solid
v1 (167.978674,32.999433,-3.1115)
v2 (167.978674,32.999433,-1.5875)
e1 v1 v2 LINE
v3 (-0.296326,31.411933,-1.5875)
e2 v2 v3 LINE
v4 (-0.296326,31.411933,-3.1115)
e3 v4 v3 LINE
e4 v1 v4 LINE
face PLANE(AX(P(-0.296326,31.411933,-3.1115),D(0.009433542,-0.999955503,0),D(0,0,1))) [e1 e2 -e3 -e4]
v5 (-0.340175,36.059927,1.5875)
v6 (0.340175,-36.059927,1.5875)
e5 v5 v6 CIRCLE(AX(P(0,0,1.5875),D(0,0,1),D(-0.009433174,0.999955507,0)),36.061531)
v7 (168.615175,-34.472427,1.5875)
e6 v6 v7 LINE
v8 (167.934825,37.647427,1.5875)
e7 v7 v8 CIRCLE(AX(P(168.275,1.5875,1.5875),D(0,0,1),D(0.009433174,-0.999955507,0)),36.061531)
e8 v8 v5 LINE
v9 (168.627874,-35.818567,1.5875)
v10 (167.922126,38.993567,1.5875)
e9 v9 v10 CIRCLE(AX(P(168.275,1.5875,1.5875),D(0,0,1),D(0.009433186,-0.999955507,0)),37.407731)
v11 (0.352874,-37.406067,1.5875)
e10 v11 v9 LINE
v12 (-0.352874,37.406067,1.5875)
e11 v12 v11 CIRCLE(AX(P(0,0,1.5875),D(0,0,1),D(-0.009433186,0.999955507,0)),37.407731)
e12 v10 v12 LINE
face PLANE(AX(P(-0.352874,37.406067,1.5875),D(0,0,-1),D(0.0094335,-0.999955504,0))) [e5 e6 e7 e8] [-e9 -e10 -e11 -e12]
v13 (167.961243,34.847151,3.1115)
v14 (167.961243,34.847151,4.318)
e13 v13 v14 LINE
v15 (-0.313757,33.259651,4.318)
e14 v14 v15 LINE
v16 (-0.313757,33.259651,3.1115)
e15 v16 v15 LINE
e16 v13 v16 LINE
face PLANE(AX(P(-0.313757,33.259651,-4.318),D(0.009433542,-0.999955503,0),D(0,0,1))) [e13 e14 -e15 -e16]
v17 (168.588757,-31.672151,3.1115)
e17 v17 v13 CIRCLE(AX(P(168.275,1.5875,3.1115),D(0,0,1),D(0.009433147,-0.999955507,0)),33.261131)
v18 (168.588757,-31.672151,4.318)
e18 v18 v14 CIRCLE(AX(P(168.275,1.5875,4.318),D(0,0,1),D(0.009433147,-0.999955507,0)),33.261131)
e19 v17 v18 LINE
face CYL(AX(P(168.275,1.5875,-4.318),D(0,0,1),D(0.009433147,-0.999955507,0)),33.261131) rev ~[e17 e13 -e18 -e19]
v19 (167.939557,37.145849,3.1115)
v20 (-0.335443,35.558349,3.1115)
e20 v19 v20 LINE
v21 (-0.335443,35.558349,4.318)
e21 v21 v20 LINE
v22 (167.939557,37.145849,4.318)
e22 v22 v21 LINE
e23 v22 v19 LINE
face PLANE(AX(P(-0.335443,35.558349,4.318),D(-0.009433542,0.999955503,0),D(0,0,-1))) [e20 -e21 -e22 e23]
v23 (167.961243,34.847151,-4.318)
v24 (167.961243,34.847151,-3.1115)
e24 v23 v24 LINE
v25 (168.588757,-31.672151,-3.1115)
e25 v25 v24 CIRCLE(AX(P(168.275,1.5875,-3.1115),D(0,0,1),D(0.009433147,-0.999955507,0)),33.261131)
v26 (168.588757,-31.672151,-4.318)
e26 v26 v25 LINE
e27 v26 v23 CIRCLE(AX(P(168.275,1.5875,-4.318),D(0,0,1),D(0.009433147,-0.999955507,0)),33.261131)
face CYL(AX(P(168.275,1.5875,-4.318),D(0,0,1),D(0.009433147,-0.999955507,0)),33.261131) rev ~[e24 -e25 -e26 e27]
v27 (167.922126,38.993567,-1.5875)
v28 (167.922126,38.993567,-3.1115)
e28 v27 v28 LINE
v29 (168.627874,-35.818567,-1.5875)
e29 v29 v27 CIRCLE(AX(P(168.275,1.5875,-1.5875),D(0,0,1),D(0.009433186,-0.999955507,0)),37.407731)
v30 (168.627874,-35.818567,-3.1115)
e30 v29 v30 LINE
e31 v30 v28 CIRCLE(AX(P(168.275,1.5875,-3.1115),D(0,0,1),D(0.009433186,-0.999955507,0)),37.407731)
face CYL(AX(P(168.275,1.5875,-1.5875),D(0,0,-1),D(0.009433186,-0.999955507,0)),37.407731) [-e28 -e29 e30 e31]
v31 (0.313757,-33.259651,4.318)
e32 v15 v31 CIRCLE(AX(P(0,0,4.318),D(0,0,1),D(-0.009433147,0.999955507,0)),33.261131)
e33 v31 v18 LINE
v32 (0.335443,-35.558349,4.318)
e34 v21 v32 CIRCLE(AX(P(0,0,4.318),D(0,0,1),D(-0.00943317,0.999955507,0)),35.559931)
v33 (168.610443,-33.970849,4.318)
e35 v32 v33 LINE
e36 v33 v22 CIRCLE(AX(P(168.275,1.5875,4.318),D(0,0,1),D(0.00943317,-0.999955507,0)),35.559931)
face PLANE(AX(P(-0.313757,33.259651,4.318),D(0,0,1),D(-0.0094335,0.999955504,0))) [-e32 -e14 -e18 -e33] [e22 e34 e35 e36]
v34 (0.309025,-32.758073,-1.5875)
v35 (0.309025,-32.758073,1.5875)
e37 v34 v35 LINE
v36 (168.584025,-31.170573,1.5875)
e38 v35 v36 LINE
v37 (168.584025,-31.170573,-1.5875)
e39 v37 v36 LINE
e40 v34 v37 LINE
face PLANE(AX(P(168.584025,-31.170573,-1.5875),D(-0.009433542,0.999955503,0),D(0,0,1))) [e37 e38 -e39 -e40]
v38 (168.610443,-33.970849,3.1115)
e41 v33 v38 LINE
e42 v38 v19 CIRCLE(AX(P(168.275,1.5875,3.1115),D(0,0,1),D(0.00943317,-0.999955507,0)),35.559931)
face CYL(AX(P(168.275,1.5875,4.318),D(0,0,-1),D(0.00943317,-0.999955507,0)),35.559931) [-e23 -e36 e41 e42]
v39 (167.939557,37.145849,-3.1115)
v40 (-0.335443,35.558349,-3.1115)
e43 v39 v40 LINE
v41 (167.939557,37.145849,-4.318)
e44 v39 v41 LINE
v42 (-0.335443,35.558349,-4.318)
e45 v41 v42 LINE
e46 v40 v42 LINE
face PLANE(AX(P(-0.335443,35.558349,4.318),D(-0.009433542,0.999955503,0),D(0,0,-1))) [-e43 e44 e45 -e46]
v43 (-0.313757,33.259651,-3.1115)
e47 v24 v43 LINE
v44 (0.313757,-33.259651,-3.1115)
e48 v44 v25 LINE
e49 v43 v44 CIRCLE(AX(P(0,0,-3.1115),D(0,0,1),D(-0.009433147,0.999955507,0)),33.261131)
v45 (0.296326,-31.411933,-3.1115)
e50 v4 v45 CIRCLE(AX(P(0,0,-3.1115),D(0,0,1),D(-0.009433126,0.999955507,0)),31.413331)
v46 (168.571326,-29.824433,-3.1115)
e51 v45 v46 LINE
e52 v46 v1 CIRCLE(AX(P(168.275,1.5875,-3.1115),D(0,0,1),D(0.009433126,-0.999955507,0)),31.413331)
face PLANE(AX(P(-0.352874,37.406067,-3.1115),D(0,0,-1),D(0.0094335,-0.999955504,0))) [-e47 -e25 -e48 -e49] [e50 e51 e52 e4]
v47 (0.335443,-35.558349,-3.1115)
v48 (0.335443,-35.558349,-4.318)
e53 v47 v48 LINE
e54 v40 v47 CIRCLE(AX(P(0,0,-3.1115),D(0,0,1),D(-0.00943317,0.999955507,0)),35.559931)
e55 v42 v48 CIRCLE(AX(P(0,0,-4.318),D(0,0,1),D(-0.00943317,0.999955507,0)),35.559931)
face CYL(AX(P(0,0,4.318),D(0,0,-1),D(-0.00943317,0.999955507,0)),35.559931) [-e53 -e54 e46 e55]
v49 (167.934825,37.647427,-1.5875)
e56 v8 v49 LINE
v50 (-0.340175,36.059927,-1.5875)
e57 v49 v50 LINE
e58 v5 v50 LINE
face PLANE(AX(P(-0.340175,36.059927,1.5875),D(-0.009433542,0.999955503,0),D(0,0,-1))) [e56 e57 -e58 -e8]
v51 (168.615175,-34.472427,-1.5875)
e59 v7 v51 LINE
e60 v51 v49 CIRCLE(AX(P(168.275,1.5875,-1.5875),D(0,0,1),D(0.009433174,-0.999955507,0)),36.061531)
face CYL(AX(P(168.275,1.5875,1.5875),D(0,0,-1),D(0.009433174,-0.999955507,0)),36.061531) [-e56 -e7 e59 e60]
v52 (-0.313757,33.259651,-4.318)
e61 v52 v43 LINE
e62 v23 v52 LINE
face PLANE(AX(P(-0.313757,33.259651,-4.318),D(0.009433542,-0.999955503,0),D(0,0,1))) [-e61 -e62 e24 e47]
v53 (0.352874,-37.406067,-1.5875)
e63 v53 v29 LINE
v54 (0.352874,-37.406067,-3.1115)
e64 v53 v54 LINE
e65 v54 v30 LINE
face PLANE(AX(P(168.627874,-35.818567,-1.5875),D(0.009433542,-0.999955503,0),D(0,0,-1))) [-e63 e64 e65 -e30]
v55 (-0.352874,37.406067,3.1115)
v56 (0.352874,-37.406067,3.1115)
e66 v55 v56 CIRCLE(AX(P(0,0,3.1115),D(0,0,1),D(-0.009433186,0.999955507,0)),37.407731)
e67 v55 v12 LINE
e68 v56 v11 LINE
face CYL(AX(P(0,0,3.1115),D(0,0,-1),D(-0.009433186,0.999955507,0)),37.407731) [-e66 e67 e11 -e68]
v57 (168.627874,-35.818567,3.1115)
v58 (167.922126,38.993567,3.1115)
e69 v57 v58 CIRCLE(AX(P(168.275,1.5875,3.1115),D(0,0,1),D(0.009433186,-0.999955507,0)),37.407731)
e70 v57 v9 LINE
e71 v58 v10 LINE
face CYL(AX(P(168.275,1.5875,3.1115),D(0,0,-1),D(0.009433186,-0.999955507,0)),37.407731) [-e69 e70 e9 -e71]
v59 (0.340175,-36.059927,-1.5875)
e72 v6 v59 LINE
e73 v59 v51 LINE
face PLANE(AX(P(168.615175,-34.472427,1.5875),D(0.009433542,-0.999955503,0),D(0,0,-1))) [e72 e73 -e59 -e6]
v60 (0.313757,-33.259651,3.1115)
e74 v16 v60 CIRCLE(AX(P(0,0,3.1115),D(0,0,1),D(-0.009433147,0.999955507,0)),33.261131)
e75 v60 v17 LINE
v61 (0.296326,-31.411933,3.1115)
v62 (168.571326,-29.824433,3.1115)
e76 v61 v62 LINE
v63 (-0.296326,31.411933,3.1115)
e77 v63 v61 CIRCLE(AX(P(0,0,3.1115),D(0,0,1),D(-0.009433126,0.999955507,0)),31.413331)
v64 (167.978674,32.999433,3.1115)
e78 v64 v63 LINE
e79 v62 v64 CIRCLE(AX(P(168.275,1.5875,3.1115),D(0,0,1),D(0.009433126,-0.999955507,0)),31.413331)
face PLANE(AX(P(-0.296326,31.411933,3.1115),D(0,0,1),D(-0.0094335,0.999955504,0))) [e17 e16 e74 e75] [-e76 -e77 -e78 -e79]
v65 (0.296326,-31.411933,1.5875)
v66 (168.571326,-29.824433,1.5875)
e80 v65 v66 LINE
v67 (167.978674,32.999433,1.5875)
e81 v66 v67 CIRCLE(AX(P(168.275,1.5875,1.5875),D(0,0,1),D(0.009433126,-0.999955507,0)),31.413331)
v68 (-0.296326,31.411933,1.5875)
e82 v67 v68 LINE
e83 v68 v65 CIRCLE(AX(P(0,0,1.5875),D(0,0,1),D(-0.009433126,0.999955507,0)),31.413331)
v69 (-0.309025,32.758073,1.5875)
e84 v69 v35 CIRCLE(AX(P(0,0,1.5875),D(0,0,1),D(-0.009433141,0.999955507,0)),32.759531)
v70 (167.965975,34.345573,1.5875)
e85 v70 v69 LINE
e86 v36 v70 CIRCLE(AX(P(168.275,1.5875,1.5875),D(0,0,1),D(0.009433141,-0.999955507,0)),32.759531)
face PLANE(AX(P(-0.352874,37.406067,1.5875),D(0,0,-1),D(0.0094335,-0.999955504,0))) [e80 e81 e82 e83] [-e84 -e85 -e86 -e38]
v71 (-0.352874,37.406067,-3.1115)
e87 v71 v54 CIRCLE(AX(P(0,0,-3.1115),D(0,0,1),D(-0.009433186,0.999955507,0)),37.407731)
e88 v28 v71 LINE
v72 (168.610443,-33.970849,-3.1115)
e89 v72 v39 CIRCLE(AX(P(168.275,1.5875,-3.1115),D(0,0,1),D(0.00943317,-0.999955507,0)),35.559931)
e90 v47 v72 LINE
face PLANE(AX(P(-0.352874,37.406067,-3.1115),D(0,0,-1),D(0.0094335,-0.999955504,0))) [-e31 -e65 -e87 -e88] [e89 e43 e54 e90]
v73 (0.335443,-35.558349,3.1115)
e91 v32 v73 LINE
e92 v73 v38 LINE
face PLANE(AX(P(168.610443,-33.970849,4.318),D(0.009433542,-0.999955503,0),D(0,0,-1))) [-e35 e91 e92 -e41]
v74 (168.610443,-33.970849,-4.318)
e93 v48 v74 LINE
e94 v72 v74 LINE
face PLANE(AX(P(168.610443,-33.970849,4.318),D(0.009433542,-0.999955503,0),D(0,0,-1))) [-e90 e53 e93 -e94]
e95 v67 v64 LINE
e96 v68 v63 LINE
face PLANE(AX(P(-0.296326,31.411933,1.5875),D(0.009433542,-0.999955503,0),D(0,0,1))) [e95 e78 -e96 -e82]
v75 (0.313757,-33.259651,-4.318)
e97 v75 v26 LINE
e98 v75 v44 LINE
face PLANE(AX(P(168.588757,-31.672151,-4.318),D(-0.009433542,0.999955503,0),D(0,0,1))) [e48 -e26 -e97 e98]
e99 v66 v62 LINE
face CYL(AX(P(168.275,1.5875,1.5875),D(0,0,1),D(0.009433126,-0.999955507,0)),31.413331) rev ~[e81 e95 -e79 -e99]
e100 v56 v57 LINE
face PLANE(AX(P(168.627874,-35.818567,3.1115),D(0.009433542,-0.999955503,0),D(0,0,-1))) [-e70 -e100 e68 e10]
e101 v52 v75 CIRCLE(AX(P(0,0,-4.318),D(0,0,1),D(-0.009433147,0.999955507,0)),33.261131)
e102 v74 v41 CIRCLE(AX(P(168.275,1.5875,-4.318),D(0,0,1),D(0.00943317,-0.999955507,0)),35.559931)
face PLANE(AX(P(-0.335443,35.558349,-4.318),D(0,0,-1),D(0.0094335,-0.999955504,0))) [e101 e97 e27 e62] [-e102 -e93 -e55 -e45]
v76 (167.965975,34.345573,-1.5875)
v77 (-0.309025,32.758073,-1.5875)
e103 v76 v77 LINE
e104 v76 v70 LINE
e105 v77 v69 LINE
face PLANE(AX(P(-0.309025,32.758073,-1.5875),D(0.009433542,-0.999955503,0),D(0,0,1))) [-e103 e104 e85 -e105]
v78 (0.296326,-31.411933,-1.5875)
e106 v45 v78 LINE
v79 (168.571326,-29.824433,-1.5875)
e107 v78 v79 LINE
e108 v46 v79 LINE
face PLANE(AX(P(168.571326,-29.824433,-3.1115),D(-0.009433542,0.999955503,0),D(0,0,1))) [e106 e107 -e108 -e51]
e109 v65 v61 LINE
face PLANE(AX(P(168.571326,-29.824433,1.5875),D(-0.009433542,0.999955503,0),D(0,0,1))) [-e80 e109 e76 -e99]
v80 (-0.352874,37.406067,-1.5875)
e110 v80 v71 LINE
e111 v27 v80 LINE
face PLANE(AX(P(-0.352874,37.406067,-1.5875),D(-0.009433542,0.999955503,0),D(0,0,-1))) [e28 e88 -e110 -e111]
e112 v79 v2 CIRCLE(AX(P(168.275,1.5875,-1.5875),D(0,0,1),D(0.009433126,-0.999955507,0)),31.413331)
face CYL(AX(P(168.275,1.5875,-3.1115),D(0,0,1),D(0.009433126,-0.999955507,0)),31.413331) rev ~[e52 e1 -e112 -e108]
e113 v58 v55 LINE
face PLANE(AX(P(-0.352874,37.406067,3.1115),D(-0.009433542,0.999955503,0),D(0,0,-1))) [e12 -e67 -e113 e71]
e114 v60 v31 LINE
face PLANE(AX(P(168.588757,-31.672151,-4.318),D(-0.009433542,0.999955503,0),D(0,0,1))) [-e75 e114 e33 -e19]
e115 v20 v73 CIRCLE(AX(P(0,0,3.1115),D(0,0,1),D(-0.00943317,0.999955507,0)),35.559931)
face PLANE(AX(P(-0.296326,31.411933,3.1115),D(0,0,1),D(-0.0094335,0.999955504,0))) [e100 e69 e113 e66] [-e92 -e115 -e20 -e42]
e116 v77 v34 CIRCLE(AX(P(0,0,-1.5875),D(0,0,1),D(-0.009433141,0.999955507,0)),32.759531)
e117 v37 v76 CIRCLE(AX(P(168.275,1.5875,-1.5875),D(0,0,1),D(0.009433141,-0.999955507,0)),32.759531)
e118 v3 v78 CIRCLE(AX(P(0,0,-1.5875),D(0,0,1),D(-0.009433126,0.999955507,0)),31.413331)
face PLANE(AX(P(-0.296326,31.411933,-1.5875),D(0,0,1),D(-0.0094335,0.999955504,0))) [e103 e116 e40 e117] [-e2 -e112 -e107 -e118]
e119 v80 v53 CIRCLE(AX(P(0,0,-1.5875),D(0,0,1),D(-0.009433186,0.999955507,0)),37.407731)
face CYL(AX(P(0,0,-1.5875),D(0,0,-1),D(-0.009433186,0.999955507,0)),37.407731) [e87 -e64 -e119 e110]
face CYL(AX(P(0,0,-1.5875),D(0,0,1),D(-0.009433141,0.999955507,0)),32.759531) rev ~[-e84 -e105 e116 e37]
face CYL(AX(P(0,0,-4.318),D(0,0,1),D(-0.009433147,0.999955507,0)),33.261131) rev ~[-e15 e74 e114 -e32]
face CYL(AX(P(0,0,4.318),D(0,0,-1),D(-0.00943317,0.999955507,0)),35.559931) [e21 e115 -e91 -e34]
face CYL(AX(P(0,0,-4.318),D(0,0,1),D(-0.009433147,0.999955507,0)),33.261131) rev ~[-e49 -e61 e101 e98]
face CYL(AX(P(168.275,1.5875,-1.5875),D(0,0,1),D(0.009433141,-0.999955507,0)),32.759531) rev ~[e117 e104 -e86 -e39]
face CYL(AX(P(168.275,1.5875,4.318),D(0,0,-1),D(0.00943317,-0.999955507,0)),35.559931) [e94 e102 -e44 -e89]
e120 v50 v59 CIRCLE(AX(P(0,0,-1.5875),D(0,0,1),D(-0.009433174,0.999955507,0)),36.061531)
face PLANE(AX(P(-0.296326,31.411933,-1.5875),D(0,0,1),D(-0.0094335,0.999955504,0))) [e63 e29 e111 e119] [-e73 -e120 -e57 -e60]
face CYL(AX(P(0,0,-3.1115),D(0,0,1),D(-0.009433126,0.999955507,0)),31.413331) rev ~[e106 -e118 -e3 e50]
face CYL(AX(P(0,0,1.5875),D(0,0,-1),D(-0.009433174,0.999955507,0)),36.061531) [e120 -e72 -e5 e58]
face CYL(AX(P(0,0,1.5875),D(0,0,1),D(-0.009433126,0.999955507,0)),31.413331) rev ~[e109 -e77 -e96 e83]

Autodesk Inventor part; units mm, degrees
ref_plane "Work Plane2" through (0, 0, 0) normal (-1, 0, 0) x (0, 0, 1)
ref_plane "Work Plane3" through (168.275, 1.5875, 0) normal (-0.9957572, 0.0920191, 0) x (0, 0, 1)
sketch "Path" plane through (0, 0, 0) normal (0, 0, 1) x (1, 0, 0)
  arc A0 (-0.3246, 34.409) -> (0.3246, -34.409) centre (0, 0) ccw
  arc A1 (168.5996, -32.8215) -> (167.9504, 35.9965) centre (168.275, 1.5875) ccw
  line L0 (168.5996, -32.8215) -> (0.3246, -34.409)
  line L1 (-0.3246, 34.409) -> (167.9504, 35.9965)
  dimension "d31" = 5.9944
ref_plane "Section Plane" through (0.3246, -34.409, 0) normal (0.9999555, 0.0094335, 0) x (0, 0, 1)
sketch "Section Sketch" plane through (0.3246, -34.409, 0) normal (0.9999555, 0.0094335, 0) x (0, 0, 1)
  line L0 (-4.318, -1.1494) -> (4.318, -1.1494)
  line L1 (4.318, -1.1494) -> (4.318, 1.1494)
  line L2 (4.318, 1.1494) -> (-4.318, 1.1494)
  line L3 (-4.318, 1.1494) -> (-4.318, -1.1494)
  line L4 (-1.5875, -1.651) -> (1.5875, -1.651)
  line L5 (1.5875, -1.651) -> (1.5875, 1.651)
  line L6 (1.5875, 1.651) -> (-1.5875, 1.651)
  line L7 (-1.5875, 1.651) -> (-1.5875, -1.651)
  line L8 (-1.5875, 0) -> (1.5875, 0) construction
  line L9 (-3.1115, -2.9972) -> (-1.5875, -2.9972)
  line L10 (-1.5875, -2.9972) -> (-1.5875, 2.9972)
  line L11 (-1.5875, 2.9972) -> (-3.1115, 2.9972)
  line L12 (-3.1115, 2.9972) -> (-3.1115, -2.9972)
  line L13 (1.5875, -2.9972) -> (3.1115, -2.9972)
  line L14 (3.1115, -2.9972) -> (3.1115, 2.9972)
  line L15 (3.1115, 2.9972) -> (1.5875, 2.9972)
  line L16 (1.5875, 2.9972) -> (1.5875, -2.9972)
  line L17 (-4.318, 0) -> (4.318, 0) construction
  point P0 (0, 0)
  point P1 (0, 0)
  dimension "d21" = 2.2987
  dimension "d22" = 3.302
  dimension "d23" = 3.175
  dimension "d24" = 1.524
  dimension "d31" = 5.9944
  dimension "d32" = 8.636
sweep "Solid" add profiles "Section Sketch" path "Path"
pattern_of_one "Strand Pattern"
equation "\"d21\" = da_d2"
equation "\"d22\" = da_d1"
equation "\"d23\" = da_b1"
equation "\"d24\" = da_t1 + da_t2"
equation "\"d30\" = da_pt"
equation "\"da_p\" = 6.35"
equation "\"da_b1\" = 3.175"
equation "\"da_h2\" = 5.9944"
equation "\"da_h3\" = 5.207"
equation "\"da_d1\" = 3.302"
equation "\"da_d2\" = 2.2987"
equation "\"da_pt\" = 6.4008"
equation "\"da_b\" = 8.636"
equation "\"da_t1\" = 0.762"
equation "\"da_t2\" = 0.762"
properties part number "Roller Chain" material "Stainless Steel, 440C"
